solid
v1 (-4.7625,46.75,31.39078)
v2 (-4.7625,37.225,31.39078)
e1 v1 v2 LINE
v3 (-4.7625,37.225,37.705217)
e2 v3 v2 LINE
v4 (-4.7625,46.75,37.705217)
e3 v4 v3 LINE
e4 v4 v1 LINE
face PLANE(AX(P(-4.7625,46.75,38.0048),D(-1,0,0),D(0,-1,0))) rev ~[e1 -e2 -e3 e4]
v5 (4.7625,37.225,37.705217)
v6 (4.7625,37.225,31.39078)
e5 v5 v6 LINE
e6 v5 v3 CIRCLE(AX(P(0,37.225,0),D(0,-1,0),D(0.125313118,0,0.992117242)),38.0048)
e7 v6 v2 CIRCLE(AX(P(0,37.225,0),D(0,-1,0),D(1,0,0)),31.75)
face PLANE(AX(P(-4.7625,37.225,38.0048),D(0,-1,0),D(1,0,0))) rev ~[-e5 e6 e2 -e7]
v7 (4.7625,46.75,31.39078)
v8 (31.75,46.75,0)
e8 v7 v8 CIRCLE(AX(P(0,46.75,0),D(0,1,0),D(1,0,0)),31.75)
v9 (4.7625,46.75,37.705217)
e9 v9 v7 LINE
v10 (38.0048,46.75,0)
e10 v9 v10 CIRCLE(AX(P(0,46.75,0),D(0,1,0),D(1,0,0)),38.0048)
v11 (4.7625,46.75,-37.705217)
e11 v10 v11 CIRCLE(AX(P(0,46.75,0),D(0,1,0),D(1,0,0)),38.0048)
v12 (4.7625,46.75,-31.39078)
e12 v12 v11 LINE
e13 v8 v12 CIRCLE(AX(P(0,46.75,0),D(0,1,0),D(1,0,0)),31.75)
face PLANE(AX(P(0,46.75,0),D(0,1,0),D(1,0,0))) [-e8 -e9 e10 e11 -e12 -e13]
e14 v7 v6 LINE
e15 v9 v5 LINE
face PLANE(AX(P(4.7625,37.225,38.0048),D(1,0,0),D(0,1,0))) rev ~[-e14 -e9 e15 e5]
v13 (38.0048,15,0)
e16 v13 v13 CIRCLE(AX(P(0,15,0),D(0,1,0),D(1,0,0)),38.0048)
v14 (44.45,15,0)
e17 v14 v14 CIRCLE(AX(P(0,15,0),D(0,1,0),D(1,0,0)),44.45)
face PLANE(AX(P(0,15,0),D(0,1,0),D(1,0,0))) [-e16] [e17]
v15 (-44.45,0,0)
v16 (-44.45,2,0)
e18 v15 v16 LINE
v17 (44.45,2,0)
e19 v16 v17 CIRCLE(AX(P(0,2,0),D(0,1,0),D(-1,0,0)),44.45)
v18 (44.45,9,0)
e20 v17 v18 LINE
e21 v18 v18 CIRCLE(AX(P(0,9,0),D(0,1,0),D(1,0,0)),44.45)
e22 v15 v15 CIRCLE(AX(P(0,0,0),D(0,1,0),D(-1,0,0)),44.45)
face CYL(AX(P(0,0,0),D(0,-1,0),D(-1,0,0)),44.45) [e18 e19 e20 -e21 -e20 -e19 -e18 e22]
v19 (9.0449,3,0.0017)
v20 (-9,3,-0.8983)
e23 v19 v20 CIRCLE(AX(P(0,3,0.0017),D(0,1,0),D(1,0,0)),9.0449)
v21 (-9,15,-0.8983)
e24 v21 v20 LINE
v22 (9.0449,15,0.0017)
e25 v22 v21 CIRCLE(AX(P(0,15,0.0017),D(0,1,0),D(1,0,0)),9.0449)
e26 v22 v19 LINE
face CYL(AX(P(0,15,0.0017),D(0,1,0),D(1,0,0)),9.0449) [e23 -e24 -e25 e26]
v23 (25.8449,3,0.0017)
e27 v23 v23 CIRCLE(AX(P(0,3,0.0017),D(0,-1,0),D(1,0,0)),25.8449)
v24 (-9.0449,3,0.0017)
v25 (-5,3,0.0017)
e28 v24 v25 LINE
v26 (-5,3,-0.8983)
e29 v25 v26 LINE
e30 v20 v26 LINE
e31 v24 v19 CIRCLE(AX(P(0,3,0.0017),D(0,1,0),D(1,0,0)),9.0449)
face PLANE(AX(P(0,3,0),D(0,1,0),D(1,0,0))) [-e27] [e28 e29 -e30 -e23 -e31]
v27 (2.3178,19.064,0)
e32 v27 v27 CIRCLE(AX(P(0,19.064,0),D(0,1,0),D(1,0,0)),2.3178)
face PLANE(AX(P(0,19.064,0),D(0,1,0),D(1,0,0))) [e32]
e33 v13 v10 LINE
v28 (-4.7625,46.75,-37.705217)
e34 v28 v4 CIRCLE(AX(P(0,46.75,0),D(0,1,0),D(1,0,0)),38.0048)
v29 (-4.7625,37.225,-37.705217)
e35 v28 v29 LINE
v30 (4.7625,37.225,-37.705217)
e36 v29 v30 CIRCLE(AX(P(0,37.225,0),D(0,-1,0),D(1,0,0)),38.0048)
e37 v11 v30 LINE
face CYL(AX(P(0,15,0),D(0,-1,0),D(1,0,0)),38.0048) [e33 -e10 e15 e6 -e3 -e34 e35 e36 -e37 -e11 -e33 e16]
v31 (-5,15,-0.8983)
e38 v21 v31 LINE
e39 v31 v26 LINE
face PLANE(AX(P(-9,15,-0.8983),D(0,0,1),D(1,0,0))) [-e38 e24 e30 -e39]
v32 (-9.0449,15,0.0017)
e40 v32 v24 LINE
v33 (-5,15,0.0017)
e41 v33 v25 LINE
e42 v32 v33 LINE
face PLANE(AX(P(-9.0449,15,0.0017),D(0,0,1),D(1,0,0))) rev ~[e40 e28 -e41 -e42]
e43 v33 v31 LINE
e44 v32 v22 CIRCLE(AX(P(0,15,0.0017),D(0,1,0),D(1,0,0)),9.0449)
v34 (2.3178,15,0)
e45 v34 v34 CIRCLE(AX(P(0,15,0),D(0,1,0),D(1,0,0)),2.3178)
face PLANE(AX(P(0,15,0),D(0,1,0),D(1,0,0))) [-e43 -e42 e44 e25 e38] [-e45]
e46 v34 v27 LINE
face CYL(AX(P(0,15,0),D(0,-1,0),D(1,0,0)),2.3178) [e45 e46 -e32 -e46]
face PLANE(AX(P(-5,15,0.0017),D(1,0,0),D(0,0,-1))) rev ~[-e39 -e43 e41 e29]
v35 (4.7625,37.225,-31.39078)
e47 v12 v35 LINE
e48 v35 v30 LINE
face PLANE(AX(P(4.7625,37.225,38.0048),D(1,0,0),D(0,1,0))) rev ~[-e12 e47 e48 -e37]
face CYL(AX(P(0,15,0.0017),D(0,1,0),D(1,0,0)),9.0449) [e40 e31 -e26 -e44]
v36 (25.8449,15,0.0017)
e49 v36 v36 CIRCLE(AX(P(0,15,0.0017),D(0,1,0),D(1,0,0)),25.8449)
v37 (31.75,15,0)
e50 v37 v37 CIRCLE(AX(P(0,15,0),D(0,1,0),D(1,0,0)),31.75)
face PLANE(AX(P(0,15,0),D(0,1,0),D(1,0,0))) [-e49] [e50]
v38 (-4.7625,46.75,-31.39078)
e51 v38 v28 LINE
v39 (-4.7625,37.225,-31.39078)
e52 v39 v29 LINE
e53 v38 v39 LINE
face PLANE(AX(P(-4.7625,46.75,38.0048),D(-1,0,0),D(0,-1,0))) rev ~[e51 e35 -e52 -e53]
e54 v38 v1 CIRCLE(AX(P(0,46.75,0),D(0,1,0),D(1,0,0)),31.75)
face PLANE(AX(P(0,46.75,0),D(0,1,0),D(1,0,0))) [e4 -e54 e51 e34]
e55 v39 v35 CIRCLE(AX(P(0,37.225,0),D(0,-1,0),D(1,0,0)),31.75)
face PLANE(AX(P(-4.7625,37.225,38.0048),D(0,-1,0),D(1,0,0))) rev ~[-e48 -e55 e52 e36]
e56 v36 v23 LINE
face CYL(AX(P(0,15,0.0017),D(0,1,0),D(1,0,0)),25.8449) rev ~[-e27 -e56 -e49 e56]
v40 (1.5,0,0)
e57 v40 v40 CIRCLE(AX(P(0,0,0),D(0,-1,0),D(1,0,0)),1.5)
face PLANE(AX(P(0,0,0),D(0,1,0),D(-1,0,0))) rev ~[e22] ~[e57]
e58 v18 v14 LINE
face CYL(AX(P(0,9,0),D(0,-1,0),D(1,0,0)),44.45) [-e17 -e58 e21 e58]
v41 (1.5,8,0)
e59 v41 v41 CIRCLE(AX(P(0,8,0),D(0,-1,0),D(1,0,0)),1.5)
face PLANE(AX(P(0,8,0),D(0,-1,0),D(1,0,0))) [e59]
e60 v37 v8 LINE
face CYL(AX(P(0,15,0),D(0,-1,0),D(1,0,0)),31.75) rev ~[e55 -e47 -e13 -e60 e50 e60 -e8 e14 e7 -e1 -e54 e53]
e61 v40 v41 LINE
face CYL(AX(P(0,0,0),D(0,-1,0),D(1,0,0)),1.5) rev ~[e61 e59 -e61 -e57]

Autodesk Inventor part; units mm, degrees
sketch "Sketch1" plane through (0, 0, 0) normal (0, 1, 0) x (-1, 0, 0)
  circle A0 centre (0, 0) radius 44.45
  circle A1 centre (0, 0) radius 6.75
  dimension "d0" = 88.9
  dimension "d3" = 13.5
extrude "Extrusion2" add sketch "Sketch1" along normal blind 2 contours A0 | A1
sketch "Sketch2" plane through (0, 2, 0) normal (0, 1, 0) x (1, 0, 0)
  circle A0 centre (0, 0) radius 10
  circle A1 centre (0, 0) radius 44.45
  dimension "d6" = 20
  dimension "d37" = 88.9
extrude "Extrusion3" add sketch "Sketch2" along normal blind 7 contours A0 | A1
sketch "Sketch3" plane through (0, 9, 0) normal (0, 1, 0) x (1, 0, 0)
  circle A0 centre (0, 0) radius 44.45
  dimension "d9" = 88.9
extrude "Extrusion4" add sketch "Sketch3" along normal blind 6
sketch "Sketch4" plane through (0, 15, 0) normal (0, 1, 0) x (1, 0, 0)
  circle A0 centre (0, 0) radius 38.0048
  circle A1 centre (0, 0) radius 31.75
  point P0 (-38.0048, 0)
  point P1 (0, 38.0048)
  point P2 (38.0048, 0)
  point P3 (0, -38.0048)
  dimension "d12" = 76.0095
  dimension "d13" = 63.5
extrude "Extrusion5" add sketch "Sketch4" along normal blind 31.75
ref_plane "Work Plane3" through (38.0048, 15, 0) normal (1, 0, 0) x (0, 1, 0)
ref_plane "Work Plane4" through (-38.0048, 15, 0) normal (-1, 0, 0) x (0, -1, 0)
sketch "Sketch8" plane through (38.0048, 15, 0) normal (1, 0, 0) x (0, 1, 0)
  line L0 (31.75, -38.0048) -> (31.75, 38.0048) projected
  line L1 (31.75, 6.35) -> (14.224, 6.35)
  line L2 (14.224, 6.35) -> (14.224, -6.35)
  line L3 (14.224, -6.35) -> (31.75, -6.35)
  line L4 (31.75, -6.35) -> (31.75, 6.35)
  line L5 (31.75, 0) -> (0, 0)
  line L6 (0, -44.45) -> (0, 44.45) projected
  line L7 (21.844, 5.08) -> (17.4498, 5.08)
  line L8 (17.4498, 5.08) -> (17.4498, -5.08)
  line L9 (17.4498, -5.08) -> (21.844, -5.08)
  line L10 (21.844, -5.08) -> (21.844, 5.08)
  line L11 (25.146, 6.35) -> (25.146, -6.35)
  point P0 (-15, 0)
  dimension "d38" = 17.526
  dimension "d39" = 12.7
  dimension "d41" = 6.35
  dimension "d42" = 9.906
  dimension "d43" = 10.16
  dimension "d44" = 5.08
  dimension "d46" = 4.3942
  dimension "d70" = 6.604
extrude "Extrusion9" [suppressed]
ref_plane "Work Plane5" through (0, 15, 0) normal (-1, 0, 0) x (0, -1, 0)
mirror "Mirror1" [suppressed]
fillet "Fillet3" [suppressed]
fillet "Fillet4" [suppressed]
fillet "Fillet5" [suppressed]
fillet "Fillet6" [suppressed]
sketch "Sketch9" plane through (0, 15, 0) normal (0, 1, 0) x (1, 0, 0)
  line L0 (-9, 0.8983) -> (-5, 0.8983)
  line L1 (-9.0449, -0.0017) -> (-5, -0.0017)
  line L2 (-5, -0.0017) -> (-5, 0.8983)
  circle A0 centre (0, -0.0017) radius 9.0449
  circle A1 centre (0, -0.0017) radius 21.8449
  line L3 (-21.8449, 0) -> (-25.8449, 0)
  circle A2 centre (0, -0.0017) radius 25.8449
  point P0 (0, 0)
  dimension "d62" = 43.6898
  dimension "d57" = 4
  dimension "d58" = 5
  dimension "d60" = 0.9
  dimension "x" = 18.0898
  dimension "d63" = 4
extrude "Extrusion10" cut sketch "Sketch9" against normal blind 12 contours L0 L2 L1 A0 | A1 | A2 picked at (-6.3416, 0.4985)
sketch "Sketch10" plane through (0, 15, 0) normal (0, 1, 0) x (1, 0, 0)
  circle A0 centre (0, 0) radius 2.3178
  dimension "d67" = 4.6355
extrude "Extrusion11" add sketch "Sketch10" along normal blind 4.064
ref_plane "Work Plane6" through (0, 15, 38.0048) normal (0, 0, 1) x (1, 0, 0)
sketch "Sketch11" plane through (0, 15, 38.0048) normal (0, 0, 1) x (1, 0, 0)
  line L0 (-31.75, 31.75) -> (31.75, 31.75) projected
  line L1 (0, 31.75) -> (0, 22.225)
  line L2 (-4.7625, 22.225) -> (4.7625, 22.225)
  line L3 (4.7625, 22.225) -> (4.7625, 31.75)
  line L4 (4.7625, 31.75) -> (-4.7625, 31.75)
  line L5 (-4.7625, 31.75) -> (-4.7625, 22.225)
  point P0 (0, -15)
  point P1 (-4.7625, 31.75)
  dimension "d71" = 9.525
  dimension "d72" = 4.7625
  dimension "d73" = 4.7625
extrude "Extrusion12" cut sketch "Sketch11" against normal blind 100.0872
sketch "Sketch12" plane through (0, 0, 0) normal (0, -1, 0) x (1, 0, 0)
  circle A0 centre (0, 0) radius 1.5
  dimension "d76" = 3
extrude "Extrusion13" cut sketch "Sketch12" against normal blind 8
thread "Thread2" size "M3x0.5" class "6H" standard "ANSI Metric M Profile" full length
properties part number "LidBottom"
